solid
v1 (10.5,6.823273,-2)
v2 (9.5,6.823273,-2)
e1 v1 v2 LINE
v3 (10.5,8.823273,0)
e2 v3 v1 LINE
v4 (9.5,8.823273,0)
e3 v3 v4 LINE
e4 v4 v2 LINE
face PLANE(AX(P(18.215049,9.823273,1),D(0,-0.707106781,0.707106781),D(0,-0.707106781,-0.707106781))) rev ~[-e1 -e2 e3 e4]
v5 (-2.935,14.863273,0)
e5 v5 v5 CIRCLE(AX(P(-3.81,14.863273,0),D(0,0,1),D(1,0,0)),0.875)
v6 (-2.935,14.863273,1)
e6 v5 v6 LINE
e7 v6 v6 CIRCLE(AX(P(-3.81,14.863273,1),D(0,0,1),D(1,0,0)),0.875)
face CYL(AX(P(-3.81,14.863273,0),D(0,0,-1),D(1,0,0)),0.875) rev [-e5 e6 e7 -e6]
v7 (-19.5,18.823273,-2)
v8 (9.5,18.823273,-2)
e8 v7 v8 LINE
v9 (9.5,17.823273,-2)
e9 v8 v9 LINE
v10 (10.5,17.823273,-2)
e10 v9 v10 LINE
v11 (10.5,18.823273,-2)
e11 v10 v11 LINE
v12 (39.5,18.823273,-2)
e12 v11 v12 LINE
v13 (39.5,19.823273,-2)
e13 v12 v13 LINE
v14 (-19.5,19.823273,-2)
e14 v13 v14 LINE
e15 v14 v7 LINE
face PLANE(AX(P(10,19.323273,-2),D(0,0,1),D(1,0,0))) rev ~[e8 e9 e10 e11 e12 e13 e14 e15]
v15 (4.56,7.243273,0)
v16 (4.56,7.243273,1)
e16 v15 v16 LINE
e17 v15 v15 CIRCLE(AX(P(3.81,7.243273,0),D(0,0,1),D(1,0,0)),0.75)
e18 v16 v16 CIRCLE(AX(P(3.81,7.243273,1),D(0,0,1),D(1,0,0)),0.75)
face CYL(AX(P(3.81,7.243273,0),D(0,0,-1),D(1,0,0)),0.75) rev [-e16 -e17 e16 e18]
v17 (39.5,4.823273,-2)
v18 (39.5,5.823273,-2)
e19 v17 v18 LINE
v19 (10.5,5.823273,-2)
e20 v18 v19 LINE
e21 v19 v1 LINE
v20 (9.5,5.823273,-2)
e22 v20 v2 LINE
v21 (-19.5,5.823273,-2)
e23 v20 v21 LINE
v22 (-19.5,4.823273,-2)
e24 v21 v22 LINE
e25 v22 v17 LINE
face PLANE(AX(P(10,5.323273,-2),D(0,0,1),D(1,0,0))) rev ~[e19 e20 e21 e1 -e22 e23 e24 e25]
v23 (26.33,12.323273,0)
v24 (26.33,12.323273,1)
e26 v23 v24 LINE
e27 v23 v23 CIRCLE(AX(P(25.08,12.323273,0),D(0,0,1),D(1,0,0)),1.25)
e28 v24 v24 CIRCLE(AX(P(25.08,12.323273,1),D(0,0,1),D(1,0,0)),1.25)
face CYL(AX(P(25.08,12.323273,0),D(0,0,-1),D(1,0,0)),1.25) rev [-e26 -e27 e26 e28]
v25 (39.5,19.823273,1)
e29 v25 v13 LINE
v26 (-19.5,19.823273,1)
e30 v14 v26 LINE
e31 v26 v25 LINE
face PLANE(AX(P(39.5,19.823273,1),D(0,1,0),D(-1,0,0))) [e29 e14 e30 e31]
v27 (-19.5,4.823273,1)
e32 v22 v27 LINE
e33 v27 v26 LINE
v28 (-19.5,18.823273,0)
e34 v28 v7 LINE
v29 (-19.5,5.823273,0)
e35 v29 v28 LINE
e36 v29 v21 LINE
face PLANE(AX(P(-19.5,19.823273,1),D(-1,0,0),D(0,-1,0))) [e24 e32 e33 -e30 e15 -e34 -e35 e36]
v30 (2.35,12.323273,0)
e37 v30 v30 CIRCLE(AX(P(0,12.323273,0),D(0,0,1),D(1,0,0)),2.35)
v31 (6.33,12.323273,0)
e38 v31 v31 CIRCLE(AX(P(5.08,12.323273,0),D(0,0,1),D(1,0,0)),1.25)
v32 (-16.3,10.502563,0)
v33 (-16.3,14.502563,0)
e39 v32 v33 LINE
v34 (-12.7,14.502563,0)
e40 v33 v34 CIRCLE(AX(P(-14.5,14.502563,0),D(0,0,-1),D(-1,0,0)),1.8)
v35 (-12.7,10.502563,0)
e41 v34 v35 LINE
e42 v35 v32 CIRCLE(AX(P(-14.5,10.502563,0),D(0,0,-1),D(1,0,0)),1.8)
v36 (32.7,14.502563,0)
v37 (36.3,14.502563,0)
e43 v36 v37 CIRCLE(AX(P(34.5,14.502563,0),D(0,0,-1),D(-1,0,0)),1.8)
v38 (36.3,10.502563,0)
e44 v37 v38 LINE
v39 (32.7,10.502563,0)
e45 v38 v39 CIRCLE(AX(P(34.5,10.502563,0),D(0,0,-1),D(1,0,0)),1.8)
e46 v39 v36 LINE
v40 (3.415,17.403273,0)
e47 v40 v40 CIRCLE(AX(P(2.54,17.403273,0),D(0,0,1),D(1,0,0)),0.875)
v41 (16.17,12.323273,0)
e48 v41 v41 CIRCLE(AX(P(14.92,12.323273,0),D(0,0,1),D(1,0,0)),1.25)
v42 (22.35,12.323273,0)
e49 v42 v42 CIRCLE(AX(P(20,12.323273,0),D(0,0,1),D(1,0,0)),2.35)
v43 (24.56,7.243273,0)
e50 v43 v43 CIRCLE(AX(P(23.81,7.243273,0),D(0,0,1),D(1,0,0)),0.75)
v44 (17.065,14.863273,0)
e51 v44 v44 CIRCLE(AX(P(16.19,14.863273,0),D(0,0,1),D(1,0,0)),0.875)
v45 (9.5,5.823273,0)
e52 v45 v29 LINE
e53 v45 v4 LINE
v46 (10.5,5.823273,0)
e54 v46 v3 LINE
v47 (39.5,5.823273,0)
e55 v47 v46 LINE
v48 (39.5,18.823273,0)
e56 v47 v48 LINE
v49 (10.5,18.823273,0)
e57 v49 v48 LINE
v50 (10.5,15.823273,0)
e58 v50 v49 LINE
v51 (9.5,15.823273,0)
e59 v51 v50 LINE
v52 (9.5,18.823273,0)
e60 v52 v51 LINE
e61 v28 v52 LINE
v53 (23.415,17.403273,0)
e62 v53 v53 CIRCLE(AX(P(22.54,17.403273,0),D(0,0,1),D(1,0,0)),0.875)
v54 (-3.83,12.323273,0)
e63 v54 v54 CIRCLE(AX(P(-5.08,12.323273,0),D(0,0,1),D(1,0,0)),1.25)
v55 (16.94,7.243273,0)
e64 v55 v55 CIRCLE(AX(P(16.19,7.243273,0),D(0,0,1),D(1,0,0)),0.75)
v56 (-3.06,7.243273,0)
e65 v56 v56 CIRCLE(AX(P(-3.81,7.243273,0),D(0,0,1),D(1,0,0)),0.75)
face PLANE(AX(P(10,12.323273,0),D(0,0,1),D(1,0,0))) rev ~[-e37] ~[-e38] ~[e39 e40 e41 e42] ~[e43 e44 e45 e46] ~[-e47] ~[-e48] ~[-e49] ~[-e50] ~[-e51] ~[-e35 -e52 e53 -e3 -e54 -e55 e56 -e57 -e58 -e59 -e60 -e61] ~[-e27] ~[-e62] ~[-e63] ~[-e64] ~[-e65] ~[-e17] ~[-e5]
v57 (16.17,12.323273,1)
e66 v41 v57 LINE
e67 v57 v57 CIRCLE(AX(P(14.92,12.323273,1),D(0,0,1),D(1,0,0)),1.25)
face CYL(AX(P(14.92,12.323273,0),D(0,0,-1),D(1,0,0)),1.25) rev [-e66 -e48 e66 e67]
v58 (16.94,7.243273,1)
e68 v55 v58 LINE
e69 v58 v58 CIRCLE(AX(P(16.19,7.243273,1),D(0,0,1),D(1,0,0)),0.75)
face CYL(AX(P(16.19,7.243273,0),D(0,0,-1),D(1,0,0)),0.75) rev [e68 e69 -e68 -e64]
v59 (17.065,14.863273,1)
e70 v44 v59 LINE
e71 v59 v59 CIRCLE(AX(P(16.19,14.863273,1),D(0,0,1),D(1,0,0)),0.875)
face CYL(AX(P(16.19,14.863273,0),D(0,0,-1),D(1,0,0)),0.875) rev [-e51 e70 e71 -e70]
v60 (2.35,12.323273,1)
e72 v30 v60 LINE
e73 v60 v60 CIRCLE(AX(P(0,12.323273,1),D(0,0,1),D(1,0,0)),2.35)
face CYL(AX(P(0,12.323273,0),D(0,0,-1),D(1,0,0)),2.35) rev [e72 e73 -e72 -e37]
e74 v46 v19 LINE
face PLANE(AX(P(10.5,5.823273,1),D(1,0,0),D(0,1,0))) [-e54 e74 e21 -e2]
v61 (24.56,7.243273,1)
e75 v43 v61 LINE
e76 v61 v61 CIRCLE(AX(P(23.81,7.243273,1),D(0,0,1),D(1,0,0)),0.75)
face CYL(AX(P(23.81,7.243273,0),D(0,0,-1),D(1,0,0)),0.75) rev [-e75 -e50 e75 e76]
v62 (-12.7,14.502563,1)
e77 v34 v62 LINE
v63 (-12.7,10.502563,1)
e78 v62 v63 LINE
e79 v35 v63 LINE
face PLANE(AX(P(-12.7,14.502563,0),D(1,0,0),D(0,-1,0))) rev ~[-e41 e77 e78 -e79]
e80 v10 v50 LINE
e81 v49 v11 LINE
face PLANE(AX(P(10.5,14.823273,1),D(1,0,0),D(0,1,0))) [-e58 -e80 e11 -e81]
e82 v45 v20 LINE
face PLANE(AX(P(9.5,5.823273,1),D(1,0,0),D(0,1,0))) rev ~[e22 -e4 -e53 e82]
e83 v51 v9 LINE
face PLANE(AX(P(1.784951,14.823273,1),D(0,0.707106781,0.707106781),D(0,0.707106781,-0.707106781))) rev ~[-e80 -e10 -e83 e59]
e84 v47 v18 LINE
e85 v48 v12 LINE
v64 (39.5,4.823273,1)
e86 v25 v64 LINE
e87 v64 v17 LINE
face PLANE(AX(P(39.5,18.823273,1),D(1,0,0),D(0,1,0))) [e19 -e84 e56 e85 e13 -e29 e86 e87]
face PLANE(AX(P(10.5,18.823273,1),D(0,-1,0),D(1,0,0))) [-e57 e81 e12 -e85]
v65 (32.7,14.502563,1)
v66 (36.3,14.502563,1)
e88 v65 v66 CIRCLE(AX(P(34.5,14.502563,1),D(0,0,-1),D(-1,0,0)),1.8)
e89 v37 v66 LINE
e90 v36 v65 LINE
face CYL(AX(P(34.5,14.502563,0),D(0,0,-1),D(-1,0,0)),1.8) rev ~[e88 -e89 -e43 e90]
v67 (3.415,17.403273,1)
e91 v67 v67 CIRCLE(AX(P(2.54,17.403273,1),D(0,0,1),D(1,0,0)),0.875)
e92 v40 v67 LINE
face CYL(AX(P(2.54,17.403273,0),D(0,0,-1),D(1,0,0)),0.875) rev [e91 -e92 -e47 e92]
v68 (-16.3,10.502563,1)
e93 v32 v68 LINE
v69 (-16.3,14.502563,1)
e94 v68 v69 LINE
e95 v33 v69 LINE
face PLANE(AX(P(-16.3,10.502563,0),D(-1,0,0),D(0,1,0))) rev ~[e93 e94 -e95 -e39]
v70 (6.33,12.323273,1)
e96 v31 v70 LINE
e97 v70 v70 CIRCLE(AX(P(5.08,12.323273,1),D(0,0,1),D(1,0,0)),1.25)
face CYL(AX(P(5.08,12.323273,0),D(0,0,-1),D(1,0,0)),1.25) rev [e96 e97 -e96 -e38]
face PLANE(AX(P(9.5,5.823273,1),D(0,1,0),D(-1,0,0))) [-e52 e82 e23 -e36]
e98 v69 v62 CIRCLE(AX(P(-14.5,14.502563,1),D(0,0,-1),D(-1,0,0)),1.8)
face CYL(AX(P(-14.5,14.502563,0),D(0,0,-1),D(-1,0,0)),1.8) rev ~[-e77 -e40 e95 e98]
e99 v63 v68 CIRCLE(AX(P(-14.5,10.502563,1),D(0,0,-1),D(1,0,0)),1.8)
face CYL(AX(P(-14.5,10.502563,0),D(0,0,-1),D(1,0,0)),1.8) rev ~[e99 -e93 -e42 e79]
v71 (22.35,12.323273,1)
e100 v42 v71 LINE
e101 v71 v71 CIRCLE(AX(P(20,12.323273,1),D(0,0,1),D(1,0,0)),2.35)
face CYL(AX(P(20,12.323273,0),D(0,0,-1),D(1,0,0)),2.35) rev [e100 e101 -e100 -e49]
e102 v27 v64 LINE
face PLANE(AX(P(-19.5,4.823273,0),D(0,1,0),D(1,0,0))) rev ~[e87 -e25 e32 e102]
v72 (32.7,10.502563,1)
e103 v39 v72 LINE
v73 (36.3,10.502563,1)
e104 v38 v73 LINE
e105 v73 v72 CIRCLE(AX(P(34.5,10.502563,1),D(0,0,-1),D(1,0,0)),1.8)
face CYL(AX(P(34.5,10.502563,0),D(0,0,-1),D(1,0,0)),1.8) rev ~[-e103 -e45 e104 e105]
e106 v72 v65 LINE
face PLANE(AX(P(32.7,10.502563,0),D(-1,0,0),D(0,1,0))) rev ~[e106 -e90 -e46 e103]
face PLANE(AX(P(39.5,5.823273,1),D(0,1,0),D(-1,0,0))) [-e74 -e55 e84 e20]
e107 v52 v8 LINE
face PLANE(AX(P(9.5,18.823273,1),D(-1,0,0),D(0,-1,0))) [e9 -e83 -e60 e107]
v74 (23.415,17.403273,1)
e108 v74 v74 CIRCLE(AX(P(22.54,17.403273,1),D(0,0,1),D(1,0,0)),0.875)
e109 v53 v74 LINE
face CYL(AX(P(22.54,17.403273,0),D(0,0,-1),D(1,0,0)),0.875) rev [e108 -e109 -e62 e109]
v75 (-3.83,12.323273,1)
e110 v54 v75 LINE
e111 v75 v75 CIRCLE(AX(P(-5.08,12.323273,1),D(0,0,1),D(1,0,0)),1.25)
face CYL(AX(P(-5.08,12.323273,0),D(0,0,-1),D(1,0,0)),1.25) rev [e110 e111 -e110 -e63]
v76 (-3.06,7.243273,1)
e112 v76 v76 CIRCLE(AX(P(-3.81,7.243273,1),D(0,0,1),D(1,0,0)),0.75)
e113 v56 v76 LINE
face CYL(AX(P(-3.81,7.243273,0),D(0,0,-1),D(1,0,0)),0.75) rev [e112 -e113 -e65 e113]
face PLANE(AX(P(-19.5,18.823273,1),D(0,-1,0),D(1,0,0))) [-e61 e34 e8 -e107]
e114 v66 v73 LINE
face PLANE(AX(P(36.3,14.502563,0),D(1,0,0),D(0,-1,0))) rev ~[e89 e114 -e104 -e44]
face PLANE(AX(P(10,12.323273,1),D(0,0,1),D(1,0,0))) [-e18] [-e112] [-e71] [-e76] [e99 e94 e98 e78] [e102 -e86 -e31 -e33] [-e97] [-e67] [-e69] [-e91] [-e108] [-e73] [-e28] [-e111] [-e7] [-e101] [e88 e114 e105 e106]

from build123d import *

# Parameters (mm, degrees)
F0_W        = 59
F0_H        = 15
F0_R        = 0.75
F0_R_2      = 1.25
F0_R_3      = 2.35
F0_R_4      = 0.875
F1_DEPTH    = 1
F2_W        = 0.5
F2_H        = 4
F3_DEPTH    = 3
F4_T4_DEPTH = 16.4300979278
F4_T9_DEPTH = 16.4300979278


# Not quite as in the source:
# - a fillet or chamfer that OpenCascade refuses, or shapes differently, is made with other operations: its cross-section is extruded or revolved along the edge and cut away or added


with BuildPart() as f1:
    # F0 (on Top) → F1 (new body)
    with BuildSketch(Plane.XY):
        with Locations((10, 12.3232733458)):
            Rectangle(F0_W, F0_H)
        with Locations((-3.81, 7.2432733458)):
            Circle(F0_R, mode=Mode.SUBTRACT)
        with Locations((3.81, 7.2432733458)):
            Circle(F0_R, mode=Mode.SUBTRACT)
        with Locations((-5.08, 12.3232733458)):
            Circle(F0_R_2, mode=Mode.SUBTRACT)
        with Locations((0, 12.3232733458)):
            Circle(F0_R_3, mode=Mode.SUBTRACT)
        with Locations((5.08, 12.3232733458)):
            Circle(F0_R_2, mode=Mode.SUBTRACT)
        with Locations((16.19, 7.2432733458)):
            Circle(F0_R, mode=Mode.SUBTRACT)
        with Locations((23.81, 7.2432733458)):
            Circle(F0_R, mode=Mode.SUBTRACT)
        with Locations((14.92, 12.3232733458)):
            Circle(F0_R_2, mode=Mode.SUBTRACT)
        with Locations((20, 12.3232733458)):
            Circle(F0_R_3, mode=Mode.SUBTRACT)
        with BuildLine():
            ThreePointArc((-16.3, 14.5025628582), (-14.5, 16.3025628582), (-12.7, 14.5025628582))
            Line((-12.7, 14.5025628582), (-12.7, 10.5025628582))
            ThreePointArc((-12.7, 10.5025628582), (-14.5, 8.7025628582), (-16.3, 10.5025628582))
            Line((-16.3, 10.5025628582), (-16.3, 14.5025628582))
        make_face(mode=Mode.SUBTRACT)
        with Locations((-3.81, 14.8632733458)):
            Circle(F0_R_4, mode=Mode.SUBTRACT)
        with Locations((2.54, 17.4032733458)):
            Circle(F0_R_4, mode=Mode.SUBTRACT)
        with Locations((16.19, 14.8632733458)):
            Circle(F0_R_4, mode=Mode.SUBTRACT)
        with Locations((25.08, 12.3232733458)):
            Circle(F0_R_2, mode=Mode.SUBTRACT)
        with BuildLine():
            ThreePointArc((36.3, 10.5025628582), (34.5, 8.7025628582), (32.7, 10.5025628582))
            Line((32.7, 10.5025628582), (32.7, 14.5025628582))
            ThreePointArc((32.7, 14.5025628582), (34.5, 16.3025628582), (36.3, 14.5025628582))
            Line((36.3, 14.5025628582), (36.3, 10.5025628582))
        make_face(mode=Mode.SUBTRACT)
        with Locations((22.54, 17.4032733458)):
            Circle(F0_R_4, mode=Mode.SUBTRACT)
    extrude(amount=F1_DEPTH)

    # F2 (on face) → F3 (join)
    with BuildSketch(Plane.XY.offset(1)):
        Polygon((39.5, 19.8232733458), (-19.5, 19.8232733458), (-19.5, 18.8232733458), (9.5, 18.8232733458), (10.5, 18.8232733458), (39.5, 18.8232733458), align=None)
        Polygon((9.5, 5.8232733458), (-19.5, 5.8232733458), (-19.5, 4.8232733458), (39.5, 4.8232733458), (39.5, 5.8232733458), (10.5, 5.8232733458), (10, 5.8232733458), align=None)
        with Locations((10.25, 7.8232733458)):
            Rectangle(F2_W, F2_H)
        Polygon((10.5, 18.8232733458), (9.5, 18.8232733458), (9.5, 14.8232733458), (10, 14.8232733458), (10.5, 14.8232733458), align=None)
        with Locations((9.75, 7.8232733458)):
            Rectangle(F2_W, F2_H)
    extrude(amount=-F3_DEPTH)

    # F4: chamfer of 3 on 2 edges, made by hand


with BuildPart() as f4_tool2:
    # F4_s3 → F4_t4 (new body)
    with BuildSketch(Plane.YZ.offset(18.2150489639)):
        Polygon((9.8232733458, 1), (6.8232733458, -2), (9.8232733458, -2), align=None)
    extrude(amount=-F4_T4_DEPTH)

    split(bisect_by=Plane.XY, keep=Keep.BOTTOM)


with BuildPart() as f1_1:
    add(f1.part)

    # F4_t1: cut F4_tool2
    add(f4_tool2.part, mode=Mode.SUBTRACT)


with BuildPart() as f4_tool7:
    # F4_s8 → F4_t9 (new body)
    with BuildSketch(Plane.YZ.offset(1.7849510361)):
        Polygon((14.8232733458, 1), (17.8232733458, -2), (14.8232733458, -2), align=None)
    extrude(amount=F4_T9_DEPTH)

    split(bisect_by=Plane.XY, keep=Keep.BOTTOM)


with BuildPart() as f1_2:
    add(f1_1.part)

    # F4_t6: cut F4_tool7
    add(f4_tool7.part, mode=Mode.SUBTRACT)


solid = f1_2.part
